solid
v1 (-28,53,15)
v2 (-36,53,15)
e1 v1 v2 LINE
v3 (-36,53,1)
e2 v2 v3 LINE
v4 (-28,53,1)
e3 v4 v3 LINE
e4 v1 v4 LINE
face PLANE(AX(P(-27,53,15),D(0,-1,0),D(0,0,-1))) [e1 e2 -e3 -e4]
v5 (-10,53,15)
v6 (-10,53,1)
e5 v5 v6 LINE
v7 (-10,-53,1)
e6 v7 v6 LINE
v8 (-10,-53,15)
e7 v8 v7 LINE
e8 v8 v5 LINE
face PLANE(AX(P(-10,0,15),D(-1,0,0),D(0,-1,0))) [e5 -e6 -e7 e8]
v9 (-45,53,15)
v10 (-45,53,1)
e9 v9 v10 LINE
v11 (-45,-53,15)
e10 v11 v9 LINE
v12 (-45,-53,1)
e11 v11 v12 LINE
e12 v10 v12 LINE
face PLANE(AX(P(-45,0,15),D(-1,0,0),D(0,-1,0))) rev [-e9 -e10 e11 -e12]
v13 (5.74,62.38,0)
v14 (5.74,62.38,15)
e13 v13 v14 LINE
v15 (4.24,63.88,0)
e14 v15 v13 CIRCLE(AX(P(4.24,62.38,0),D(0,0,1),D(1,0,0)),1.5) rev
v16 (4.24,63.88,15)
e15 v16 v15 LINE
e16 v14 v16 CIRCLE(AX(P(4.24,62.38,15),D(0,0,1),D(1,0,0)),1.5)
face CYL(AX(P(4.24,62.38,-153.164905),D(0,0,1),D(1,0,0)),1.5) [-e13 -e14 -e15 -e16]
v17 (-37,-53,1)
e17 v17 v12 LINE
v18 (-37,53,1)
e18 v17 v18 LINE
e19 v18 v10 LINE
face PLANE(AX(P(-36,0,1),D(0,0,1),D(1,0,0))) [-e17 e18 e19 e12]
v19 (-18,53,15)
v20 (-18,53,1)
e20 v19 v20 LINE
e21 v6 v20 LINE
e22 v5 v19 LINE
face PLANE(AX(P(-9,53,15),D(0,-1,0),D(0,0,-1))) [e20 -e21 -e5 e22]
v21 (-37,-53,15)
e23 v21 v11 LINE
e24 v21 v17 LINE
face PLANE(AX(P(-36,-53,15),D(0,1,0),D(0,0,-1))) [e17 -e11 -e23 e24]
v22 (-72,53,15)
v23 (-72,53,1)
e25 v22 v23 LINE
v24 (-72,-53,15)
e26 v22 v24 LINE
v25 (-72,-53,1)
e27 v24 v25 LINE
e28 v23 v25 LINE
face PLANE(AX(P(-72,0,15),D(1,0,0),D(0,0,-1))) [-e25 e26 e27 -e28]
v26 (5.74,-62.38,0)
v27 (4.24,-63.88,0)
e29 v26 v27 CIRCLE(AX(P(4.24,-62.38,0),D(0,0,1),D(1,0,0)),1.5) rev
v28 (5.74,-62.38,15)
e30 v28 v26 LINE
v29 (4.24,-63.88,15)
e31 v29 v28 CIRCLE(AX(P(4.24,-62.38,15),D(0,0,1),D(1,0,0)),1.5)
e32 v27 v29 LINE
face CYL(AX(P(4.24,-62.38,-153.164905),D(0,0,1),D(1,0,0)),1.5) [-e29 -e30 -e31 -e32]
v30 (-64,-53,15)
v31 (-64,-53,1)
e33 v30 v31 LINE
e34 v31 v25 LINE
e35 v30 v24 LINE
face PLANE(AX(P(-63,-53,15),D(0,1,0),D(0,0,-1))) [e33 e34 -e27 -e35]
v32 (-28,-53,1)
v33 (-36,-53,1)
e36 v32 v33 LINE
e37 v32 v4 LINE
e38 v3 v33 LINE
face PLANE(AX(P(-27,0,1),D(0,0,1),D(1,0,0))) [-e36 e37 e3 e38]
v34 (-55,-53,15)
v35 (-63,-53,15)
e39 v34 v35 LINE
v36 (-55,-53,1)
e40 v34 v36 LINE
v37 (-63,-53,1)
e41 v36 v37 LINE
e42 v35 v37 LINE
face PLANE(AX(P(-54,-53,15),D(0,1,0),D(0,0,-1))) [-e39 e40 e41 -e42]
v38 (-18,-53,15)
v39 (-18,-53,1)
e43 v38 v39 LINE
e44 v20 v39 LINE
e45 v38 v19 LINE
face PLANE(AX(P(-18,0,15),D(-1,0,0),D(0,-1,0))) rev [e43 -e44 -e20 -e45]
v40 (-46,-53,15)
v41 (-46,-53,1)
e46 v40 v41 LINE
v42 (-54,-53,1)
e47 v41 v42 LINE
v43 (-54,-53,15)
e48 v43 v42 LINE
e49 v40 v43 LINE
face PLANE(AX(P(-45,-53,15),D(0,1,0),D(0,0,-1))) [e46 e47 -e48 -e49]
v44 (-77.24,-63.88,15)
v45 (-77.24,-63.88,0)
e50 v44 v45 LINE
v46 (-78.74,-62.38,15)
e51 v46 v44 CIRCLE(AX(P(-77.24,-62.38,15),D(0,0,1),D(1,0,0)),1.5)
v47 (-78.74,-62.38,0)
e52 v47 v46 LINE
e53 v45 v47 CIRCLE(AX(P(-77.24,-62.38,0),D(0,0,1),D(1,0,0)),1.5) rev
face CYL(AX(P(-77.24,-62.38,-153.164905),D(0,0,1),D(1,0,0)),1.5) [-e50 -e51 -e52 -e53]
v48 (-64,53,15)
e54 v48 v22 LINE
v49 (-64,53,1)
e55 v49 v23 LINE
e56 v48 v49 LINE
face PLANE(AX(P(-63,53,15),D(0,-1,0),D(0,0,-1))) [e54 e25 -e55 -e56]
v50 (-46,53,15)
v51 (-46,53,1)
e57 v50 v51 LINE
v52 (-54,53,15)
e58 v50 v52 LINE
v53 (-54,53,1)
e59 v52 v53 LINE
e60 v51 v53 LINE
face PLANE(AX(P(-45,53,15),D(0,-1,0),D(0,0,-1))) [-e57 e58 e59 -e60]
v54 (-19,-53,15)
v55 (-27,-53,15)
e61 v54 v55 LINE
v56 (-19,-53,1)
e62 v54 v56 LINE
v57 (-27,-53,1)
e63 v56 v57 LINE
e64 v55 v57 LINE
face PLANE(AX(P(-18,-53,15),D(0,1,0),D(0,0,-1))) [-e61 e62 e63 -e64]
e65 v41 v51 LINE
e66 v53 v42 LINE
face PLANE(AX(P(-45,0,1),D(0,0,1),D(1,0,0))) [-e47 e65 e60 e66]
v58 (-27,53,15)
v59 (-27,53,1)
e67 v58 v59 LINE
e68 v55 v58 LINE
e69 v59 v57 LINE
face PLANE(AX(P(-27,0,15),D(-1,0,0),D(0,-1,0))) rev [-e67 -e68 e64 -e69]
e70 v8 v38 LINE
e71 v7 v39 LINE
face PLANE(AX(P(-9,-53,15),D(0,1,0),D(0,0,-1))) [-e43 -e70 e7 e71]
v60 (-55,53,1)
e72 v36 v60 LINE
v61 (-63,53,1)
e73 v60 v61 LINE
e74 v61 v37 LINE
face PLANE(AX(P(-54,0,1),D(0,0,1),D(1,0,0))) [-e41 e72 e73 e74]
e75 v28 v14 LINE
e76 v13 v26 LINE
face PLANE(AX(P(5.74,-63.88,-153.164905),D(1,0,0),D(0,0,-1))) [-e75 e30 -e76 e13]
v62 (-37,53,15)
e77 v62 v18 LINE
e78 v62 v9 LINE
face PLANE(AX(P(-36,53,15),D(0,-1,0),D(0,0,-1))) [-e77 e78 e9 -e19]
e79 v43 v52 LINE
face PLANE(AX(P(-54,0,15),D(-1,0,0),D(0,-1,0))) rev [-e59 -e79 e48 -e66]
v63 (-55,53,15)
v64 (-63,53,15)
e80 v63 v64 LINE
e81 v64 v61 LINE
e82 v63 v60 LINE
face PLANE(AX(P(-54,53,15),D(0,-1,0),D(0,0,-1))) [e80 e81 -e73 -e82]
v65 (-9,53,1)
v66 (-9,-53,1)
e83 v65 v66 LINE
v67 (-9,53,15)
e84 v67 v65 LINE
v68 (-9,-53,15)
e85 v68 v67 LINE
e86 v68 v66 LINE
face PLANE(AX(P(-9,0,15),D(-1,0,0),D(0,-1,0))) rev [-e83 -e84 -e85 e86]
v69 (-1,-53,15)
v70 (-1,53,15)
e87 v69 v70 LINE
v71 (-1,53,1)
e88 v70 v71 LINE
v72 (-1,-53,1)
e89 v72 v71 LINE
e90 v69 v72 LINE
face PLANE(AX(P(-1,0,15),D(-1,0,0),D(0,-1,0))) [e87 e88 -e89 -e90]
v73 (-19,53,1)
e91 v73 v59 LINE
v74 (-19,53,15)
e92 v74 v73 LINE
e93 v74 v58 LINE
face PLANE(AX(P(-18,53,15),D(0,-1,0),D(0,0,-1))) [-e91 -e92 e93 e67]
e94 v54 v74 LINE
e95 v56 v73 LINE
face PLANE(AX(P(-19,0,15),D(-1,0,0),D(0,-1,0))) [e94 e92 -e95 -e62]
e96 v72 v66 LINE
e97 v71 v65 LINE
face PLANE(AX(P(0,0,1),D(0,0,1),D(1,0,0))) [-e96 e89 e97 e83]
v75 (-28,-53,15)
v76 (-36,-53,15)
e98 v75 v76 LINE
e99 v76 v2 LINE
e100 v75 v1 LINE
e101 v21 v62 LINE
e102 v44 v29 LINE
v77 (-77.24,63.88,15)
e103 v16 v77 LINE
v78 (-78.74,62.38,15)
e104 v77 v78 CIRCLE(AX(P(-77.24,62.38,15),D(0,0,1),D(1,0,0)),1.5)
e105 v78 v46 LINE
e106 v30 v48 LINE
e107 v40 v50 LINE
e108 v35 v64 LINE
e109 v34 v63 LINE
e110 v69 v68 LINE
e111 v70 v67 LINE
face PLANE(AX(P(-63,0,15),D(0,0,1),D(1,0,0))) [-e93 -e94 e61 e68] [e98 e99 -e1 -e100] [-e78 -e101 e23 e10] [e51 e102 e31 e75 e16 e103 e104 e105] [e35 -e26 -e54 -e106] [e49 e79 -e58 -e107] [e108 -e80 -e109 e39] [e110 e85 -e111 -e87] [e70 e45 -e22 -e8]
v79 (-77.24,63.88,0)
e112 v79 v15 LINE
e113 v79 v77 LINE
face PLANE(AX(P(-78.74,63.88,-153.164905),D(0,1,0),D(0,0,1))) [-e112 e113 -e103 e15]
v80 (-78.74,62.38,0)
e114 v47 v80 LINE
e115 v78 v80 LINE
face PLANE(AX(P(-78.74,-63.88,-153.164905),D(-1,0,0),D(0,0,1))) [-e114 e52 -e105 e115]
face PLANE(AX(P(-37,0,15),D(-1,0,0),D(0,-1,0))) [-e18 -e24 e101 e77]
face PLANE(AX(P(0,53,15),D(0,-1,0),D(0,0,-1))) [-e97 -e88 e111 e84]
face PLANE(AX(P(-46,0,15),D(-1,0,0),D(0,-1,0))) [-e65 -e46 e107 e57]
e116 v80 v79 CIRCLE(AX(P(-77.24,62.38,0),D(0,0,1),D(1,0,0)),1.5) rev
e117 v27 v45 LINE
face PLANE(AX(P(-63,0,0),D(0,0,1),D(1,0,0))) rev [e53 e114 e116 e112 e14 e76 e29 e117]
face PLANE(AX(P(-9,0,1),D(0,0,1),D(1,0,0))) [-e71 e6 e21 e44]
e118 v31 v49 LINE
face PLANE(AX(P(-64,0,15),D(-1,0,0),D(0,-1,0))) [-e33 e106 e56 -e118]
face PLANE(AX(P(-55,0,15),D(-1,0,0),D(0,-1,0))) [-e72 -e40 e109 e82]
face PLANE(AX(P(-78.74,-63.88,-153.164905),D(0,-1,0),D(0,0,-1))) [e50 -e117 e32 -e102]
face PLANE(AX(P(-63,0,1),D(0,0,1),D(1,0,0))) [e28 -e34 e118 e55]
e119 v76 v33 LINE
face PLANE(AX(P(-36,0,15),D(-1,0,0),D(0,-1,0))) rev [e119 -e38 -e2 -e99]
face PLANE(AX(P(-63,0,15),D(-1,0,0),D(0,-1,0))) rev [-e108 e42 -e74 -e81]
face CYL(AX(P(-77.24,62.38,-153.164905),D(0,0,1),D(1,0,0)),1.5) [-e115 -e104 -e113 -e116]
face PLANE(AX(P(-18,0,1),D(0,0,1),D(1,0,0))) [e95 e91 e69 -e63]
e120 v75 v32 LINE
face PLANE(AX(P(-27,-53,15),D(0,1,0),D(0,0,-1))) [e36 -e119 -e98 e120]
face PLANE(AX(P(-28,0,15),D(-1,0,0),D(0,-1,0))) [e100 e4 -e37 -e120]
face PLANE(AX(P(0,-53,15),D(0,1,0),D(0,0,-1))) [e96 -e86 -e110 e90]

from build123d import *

# Parameters (mm, degrees)
SKIZZE1_W                       = 10
SKIZZE1_H                       = 54
AUFSATZ_LINEAR_AUSTRAGEN1_DEPTH = 15
SCHALE1_T                       = -1
LINEARES_MUSTER1_COUNT          = 8
LINEARES_MUSTER1_PITCH          = 9
SKIZZE2_W                       = 84.48
SKIZZE2_H                       = 127.76
SKIZZE2_W_2                     = 73
SKIZZE2_H_2                     = 108
AUFSATZ_LINEAR_AUSTRAGEN2_DEPTH = 15
VERRUNDUNG1_R                   = 1.5


with BuildPart() as part:
    # Skizze1 → Aufsatz-Linear austragen1 (new body)
    with BuildSketch(Plane.XY):
        with Locations((-5, 27)):
            Rectangle(SKIZZE1_W, SKIZZE1_H)
    extrude(amount=AUFSATZ_LINEAR_AUSTRAGEN1_DEPTH)

    # Schale1
    schale1_openings = [part.faces().sort_by_distance(p)[0] for p in [
        (-5, 27, 15),
        (-5, 0, 7.5),
    ]]
    offset(amount=SCHALE1_T, openings=schale1_openings, kind=Kind.INTERSECTION)


with BuildPart() as lineares_muster1_1:
    # Lineares Muster1: pattern copy
    add(part.part.moved(Location(Vector(-1, 0, 0) * (1 * LINEARES_MUSTER1_PITCH))))


with BuildPart() as lineares_muster1_2:
    # Lineares Muster1: pattern copy
    add(part.part.moved(Location(Vector(-1, 0, 0) * (2 * LINEARES_MUSTER1_PITCH))))


with BuildPart() as lineares_muster1_3:
    # Lineares Muster1: pattern copy
    add(part.part.moved(Location(Vector(-1, 0, 0) * (3 * LINEARES_MUSTER1_PITCH))))


with BuildPart() as lineares_muster1_4:
    # Lineares Muster1: pattern copy
    add(part.part.moved(Location(Vector(-1, 0, 0) * (4 * LINEARES_MUSTER1_PITCH))))


with BuildPart() as lineares_muster1_5:
    # Lineares Muster1: pattern copy
    add(part.part.moved(Location(Vector(-1, 0, 0) * (5 * LINEARES_MUSTER1_PITCH))))


with BuildPart() as lineares_muster1_6:
    # Lineares Muster1: pattern copy
    add(part.part.moved(Location(Vector(-1, 0, 0) * (6 * LINEARES_MUSTER1_PITCH))))


with BuildPart() as lineares_muster1_7:
    # Lineares Muster1: pattern copy
    add(part.part.moved(Location(Vector(-1, 0, 0) * (7 * LINEARES_MUSTER1_PITCH))))


with BuildPart() as part_1:
    add(part.part)

    # Kombinieren1: read off the stored shape, not the designer's step
    # Kombinieren1: union Lineares Muster1_1, Lineares Muster1_2, Lineares Muster1_3, Lineares Muster1_4, Lineares Muster1_5, Lineares Muster1_6, Lineares Muster1_7
    add(lineares_muster1_1.part)
    add(lineares_muster1_2.part)
    add(lineares_muster1_3.part)
    add(lineares_muster1_4.part)
    add(lineares_muster1_5.part)
    add(lineares_muster1_6.part)
    add(lineares_muster1_7.part)

    # Spiegeln1: part across plane


with BuildPart() as part_2:
    add(part_1.part)
    add(part_1.part.mirror(Plane(origin=(-63, 0, 15), x_dir=(0, 0, 1), z_dir=(0, 1, 0))))

    # Skizze2 → Aufsatz-Linear austragen2 (add)
    with BuildSketch(Plane.XY.offset(15)):
        with Locations((-36.5, 0)):
            Rectangle(SKIZZE2_W, SKIZZE2_H)
        with Locations((-36.5, 0)):
            Rectangle(SKIZZE2_W_2, SKIZZE2_H_2, mode=Mode.SUBTRACT)
    extrude(amount=-AUFSATZ_LINEAR_AUSTRAGEN2_DEPTH)

    # Verrundung1
    verrundung1_edges = [part_2.edges().sort_by_distance(p)[0] for p in [
        (-78.74, 63.88, 7.5),
        (-78.74, -63.88, 7.5),
        (5.74, -63.88, 7.5),
        (5.74, 63.88, 7.5),
    ]]
    fillet(verrundung1_edges, radius=VERRUNDUNG1_R)


solid = part_2.part
